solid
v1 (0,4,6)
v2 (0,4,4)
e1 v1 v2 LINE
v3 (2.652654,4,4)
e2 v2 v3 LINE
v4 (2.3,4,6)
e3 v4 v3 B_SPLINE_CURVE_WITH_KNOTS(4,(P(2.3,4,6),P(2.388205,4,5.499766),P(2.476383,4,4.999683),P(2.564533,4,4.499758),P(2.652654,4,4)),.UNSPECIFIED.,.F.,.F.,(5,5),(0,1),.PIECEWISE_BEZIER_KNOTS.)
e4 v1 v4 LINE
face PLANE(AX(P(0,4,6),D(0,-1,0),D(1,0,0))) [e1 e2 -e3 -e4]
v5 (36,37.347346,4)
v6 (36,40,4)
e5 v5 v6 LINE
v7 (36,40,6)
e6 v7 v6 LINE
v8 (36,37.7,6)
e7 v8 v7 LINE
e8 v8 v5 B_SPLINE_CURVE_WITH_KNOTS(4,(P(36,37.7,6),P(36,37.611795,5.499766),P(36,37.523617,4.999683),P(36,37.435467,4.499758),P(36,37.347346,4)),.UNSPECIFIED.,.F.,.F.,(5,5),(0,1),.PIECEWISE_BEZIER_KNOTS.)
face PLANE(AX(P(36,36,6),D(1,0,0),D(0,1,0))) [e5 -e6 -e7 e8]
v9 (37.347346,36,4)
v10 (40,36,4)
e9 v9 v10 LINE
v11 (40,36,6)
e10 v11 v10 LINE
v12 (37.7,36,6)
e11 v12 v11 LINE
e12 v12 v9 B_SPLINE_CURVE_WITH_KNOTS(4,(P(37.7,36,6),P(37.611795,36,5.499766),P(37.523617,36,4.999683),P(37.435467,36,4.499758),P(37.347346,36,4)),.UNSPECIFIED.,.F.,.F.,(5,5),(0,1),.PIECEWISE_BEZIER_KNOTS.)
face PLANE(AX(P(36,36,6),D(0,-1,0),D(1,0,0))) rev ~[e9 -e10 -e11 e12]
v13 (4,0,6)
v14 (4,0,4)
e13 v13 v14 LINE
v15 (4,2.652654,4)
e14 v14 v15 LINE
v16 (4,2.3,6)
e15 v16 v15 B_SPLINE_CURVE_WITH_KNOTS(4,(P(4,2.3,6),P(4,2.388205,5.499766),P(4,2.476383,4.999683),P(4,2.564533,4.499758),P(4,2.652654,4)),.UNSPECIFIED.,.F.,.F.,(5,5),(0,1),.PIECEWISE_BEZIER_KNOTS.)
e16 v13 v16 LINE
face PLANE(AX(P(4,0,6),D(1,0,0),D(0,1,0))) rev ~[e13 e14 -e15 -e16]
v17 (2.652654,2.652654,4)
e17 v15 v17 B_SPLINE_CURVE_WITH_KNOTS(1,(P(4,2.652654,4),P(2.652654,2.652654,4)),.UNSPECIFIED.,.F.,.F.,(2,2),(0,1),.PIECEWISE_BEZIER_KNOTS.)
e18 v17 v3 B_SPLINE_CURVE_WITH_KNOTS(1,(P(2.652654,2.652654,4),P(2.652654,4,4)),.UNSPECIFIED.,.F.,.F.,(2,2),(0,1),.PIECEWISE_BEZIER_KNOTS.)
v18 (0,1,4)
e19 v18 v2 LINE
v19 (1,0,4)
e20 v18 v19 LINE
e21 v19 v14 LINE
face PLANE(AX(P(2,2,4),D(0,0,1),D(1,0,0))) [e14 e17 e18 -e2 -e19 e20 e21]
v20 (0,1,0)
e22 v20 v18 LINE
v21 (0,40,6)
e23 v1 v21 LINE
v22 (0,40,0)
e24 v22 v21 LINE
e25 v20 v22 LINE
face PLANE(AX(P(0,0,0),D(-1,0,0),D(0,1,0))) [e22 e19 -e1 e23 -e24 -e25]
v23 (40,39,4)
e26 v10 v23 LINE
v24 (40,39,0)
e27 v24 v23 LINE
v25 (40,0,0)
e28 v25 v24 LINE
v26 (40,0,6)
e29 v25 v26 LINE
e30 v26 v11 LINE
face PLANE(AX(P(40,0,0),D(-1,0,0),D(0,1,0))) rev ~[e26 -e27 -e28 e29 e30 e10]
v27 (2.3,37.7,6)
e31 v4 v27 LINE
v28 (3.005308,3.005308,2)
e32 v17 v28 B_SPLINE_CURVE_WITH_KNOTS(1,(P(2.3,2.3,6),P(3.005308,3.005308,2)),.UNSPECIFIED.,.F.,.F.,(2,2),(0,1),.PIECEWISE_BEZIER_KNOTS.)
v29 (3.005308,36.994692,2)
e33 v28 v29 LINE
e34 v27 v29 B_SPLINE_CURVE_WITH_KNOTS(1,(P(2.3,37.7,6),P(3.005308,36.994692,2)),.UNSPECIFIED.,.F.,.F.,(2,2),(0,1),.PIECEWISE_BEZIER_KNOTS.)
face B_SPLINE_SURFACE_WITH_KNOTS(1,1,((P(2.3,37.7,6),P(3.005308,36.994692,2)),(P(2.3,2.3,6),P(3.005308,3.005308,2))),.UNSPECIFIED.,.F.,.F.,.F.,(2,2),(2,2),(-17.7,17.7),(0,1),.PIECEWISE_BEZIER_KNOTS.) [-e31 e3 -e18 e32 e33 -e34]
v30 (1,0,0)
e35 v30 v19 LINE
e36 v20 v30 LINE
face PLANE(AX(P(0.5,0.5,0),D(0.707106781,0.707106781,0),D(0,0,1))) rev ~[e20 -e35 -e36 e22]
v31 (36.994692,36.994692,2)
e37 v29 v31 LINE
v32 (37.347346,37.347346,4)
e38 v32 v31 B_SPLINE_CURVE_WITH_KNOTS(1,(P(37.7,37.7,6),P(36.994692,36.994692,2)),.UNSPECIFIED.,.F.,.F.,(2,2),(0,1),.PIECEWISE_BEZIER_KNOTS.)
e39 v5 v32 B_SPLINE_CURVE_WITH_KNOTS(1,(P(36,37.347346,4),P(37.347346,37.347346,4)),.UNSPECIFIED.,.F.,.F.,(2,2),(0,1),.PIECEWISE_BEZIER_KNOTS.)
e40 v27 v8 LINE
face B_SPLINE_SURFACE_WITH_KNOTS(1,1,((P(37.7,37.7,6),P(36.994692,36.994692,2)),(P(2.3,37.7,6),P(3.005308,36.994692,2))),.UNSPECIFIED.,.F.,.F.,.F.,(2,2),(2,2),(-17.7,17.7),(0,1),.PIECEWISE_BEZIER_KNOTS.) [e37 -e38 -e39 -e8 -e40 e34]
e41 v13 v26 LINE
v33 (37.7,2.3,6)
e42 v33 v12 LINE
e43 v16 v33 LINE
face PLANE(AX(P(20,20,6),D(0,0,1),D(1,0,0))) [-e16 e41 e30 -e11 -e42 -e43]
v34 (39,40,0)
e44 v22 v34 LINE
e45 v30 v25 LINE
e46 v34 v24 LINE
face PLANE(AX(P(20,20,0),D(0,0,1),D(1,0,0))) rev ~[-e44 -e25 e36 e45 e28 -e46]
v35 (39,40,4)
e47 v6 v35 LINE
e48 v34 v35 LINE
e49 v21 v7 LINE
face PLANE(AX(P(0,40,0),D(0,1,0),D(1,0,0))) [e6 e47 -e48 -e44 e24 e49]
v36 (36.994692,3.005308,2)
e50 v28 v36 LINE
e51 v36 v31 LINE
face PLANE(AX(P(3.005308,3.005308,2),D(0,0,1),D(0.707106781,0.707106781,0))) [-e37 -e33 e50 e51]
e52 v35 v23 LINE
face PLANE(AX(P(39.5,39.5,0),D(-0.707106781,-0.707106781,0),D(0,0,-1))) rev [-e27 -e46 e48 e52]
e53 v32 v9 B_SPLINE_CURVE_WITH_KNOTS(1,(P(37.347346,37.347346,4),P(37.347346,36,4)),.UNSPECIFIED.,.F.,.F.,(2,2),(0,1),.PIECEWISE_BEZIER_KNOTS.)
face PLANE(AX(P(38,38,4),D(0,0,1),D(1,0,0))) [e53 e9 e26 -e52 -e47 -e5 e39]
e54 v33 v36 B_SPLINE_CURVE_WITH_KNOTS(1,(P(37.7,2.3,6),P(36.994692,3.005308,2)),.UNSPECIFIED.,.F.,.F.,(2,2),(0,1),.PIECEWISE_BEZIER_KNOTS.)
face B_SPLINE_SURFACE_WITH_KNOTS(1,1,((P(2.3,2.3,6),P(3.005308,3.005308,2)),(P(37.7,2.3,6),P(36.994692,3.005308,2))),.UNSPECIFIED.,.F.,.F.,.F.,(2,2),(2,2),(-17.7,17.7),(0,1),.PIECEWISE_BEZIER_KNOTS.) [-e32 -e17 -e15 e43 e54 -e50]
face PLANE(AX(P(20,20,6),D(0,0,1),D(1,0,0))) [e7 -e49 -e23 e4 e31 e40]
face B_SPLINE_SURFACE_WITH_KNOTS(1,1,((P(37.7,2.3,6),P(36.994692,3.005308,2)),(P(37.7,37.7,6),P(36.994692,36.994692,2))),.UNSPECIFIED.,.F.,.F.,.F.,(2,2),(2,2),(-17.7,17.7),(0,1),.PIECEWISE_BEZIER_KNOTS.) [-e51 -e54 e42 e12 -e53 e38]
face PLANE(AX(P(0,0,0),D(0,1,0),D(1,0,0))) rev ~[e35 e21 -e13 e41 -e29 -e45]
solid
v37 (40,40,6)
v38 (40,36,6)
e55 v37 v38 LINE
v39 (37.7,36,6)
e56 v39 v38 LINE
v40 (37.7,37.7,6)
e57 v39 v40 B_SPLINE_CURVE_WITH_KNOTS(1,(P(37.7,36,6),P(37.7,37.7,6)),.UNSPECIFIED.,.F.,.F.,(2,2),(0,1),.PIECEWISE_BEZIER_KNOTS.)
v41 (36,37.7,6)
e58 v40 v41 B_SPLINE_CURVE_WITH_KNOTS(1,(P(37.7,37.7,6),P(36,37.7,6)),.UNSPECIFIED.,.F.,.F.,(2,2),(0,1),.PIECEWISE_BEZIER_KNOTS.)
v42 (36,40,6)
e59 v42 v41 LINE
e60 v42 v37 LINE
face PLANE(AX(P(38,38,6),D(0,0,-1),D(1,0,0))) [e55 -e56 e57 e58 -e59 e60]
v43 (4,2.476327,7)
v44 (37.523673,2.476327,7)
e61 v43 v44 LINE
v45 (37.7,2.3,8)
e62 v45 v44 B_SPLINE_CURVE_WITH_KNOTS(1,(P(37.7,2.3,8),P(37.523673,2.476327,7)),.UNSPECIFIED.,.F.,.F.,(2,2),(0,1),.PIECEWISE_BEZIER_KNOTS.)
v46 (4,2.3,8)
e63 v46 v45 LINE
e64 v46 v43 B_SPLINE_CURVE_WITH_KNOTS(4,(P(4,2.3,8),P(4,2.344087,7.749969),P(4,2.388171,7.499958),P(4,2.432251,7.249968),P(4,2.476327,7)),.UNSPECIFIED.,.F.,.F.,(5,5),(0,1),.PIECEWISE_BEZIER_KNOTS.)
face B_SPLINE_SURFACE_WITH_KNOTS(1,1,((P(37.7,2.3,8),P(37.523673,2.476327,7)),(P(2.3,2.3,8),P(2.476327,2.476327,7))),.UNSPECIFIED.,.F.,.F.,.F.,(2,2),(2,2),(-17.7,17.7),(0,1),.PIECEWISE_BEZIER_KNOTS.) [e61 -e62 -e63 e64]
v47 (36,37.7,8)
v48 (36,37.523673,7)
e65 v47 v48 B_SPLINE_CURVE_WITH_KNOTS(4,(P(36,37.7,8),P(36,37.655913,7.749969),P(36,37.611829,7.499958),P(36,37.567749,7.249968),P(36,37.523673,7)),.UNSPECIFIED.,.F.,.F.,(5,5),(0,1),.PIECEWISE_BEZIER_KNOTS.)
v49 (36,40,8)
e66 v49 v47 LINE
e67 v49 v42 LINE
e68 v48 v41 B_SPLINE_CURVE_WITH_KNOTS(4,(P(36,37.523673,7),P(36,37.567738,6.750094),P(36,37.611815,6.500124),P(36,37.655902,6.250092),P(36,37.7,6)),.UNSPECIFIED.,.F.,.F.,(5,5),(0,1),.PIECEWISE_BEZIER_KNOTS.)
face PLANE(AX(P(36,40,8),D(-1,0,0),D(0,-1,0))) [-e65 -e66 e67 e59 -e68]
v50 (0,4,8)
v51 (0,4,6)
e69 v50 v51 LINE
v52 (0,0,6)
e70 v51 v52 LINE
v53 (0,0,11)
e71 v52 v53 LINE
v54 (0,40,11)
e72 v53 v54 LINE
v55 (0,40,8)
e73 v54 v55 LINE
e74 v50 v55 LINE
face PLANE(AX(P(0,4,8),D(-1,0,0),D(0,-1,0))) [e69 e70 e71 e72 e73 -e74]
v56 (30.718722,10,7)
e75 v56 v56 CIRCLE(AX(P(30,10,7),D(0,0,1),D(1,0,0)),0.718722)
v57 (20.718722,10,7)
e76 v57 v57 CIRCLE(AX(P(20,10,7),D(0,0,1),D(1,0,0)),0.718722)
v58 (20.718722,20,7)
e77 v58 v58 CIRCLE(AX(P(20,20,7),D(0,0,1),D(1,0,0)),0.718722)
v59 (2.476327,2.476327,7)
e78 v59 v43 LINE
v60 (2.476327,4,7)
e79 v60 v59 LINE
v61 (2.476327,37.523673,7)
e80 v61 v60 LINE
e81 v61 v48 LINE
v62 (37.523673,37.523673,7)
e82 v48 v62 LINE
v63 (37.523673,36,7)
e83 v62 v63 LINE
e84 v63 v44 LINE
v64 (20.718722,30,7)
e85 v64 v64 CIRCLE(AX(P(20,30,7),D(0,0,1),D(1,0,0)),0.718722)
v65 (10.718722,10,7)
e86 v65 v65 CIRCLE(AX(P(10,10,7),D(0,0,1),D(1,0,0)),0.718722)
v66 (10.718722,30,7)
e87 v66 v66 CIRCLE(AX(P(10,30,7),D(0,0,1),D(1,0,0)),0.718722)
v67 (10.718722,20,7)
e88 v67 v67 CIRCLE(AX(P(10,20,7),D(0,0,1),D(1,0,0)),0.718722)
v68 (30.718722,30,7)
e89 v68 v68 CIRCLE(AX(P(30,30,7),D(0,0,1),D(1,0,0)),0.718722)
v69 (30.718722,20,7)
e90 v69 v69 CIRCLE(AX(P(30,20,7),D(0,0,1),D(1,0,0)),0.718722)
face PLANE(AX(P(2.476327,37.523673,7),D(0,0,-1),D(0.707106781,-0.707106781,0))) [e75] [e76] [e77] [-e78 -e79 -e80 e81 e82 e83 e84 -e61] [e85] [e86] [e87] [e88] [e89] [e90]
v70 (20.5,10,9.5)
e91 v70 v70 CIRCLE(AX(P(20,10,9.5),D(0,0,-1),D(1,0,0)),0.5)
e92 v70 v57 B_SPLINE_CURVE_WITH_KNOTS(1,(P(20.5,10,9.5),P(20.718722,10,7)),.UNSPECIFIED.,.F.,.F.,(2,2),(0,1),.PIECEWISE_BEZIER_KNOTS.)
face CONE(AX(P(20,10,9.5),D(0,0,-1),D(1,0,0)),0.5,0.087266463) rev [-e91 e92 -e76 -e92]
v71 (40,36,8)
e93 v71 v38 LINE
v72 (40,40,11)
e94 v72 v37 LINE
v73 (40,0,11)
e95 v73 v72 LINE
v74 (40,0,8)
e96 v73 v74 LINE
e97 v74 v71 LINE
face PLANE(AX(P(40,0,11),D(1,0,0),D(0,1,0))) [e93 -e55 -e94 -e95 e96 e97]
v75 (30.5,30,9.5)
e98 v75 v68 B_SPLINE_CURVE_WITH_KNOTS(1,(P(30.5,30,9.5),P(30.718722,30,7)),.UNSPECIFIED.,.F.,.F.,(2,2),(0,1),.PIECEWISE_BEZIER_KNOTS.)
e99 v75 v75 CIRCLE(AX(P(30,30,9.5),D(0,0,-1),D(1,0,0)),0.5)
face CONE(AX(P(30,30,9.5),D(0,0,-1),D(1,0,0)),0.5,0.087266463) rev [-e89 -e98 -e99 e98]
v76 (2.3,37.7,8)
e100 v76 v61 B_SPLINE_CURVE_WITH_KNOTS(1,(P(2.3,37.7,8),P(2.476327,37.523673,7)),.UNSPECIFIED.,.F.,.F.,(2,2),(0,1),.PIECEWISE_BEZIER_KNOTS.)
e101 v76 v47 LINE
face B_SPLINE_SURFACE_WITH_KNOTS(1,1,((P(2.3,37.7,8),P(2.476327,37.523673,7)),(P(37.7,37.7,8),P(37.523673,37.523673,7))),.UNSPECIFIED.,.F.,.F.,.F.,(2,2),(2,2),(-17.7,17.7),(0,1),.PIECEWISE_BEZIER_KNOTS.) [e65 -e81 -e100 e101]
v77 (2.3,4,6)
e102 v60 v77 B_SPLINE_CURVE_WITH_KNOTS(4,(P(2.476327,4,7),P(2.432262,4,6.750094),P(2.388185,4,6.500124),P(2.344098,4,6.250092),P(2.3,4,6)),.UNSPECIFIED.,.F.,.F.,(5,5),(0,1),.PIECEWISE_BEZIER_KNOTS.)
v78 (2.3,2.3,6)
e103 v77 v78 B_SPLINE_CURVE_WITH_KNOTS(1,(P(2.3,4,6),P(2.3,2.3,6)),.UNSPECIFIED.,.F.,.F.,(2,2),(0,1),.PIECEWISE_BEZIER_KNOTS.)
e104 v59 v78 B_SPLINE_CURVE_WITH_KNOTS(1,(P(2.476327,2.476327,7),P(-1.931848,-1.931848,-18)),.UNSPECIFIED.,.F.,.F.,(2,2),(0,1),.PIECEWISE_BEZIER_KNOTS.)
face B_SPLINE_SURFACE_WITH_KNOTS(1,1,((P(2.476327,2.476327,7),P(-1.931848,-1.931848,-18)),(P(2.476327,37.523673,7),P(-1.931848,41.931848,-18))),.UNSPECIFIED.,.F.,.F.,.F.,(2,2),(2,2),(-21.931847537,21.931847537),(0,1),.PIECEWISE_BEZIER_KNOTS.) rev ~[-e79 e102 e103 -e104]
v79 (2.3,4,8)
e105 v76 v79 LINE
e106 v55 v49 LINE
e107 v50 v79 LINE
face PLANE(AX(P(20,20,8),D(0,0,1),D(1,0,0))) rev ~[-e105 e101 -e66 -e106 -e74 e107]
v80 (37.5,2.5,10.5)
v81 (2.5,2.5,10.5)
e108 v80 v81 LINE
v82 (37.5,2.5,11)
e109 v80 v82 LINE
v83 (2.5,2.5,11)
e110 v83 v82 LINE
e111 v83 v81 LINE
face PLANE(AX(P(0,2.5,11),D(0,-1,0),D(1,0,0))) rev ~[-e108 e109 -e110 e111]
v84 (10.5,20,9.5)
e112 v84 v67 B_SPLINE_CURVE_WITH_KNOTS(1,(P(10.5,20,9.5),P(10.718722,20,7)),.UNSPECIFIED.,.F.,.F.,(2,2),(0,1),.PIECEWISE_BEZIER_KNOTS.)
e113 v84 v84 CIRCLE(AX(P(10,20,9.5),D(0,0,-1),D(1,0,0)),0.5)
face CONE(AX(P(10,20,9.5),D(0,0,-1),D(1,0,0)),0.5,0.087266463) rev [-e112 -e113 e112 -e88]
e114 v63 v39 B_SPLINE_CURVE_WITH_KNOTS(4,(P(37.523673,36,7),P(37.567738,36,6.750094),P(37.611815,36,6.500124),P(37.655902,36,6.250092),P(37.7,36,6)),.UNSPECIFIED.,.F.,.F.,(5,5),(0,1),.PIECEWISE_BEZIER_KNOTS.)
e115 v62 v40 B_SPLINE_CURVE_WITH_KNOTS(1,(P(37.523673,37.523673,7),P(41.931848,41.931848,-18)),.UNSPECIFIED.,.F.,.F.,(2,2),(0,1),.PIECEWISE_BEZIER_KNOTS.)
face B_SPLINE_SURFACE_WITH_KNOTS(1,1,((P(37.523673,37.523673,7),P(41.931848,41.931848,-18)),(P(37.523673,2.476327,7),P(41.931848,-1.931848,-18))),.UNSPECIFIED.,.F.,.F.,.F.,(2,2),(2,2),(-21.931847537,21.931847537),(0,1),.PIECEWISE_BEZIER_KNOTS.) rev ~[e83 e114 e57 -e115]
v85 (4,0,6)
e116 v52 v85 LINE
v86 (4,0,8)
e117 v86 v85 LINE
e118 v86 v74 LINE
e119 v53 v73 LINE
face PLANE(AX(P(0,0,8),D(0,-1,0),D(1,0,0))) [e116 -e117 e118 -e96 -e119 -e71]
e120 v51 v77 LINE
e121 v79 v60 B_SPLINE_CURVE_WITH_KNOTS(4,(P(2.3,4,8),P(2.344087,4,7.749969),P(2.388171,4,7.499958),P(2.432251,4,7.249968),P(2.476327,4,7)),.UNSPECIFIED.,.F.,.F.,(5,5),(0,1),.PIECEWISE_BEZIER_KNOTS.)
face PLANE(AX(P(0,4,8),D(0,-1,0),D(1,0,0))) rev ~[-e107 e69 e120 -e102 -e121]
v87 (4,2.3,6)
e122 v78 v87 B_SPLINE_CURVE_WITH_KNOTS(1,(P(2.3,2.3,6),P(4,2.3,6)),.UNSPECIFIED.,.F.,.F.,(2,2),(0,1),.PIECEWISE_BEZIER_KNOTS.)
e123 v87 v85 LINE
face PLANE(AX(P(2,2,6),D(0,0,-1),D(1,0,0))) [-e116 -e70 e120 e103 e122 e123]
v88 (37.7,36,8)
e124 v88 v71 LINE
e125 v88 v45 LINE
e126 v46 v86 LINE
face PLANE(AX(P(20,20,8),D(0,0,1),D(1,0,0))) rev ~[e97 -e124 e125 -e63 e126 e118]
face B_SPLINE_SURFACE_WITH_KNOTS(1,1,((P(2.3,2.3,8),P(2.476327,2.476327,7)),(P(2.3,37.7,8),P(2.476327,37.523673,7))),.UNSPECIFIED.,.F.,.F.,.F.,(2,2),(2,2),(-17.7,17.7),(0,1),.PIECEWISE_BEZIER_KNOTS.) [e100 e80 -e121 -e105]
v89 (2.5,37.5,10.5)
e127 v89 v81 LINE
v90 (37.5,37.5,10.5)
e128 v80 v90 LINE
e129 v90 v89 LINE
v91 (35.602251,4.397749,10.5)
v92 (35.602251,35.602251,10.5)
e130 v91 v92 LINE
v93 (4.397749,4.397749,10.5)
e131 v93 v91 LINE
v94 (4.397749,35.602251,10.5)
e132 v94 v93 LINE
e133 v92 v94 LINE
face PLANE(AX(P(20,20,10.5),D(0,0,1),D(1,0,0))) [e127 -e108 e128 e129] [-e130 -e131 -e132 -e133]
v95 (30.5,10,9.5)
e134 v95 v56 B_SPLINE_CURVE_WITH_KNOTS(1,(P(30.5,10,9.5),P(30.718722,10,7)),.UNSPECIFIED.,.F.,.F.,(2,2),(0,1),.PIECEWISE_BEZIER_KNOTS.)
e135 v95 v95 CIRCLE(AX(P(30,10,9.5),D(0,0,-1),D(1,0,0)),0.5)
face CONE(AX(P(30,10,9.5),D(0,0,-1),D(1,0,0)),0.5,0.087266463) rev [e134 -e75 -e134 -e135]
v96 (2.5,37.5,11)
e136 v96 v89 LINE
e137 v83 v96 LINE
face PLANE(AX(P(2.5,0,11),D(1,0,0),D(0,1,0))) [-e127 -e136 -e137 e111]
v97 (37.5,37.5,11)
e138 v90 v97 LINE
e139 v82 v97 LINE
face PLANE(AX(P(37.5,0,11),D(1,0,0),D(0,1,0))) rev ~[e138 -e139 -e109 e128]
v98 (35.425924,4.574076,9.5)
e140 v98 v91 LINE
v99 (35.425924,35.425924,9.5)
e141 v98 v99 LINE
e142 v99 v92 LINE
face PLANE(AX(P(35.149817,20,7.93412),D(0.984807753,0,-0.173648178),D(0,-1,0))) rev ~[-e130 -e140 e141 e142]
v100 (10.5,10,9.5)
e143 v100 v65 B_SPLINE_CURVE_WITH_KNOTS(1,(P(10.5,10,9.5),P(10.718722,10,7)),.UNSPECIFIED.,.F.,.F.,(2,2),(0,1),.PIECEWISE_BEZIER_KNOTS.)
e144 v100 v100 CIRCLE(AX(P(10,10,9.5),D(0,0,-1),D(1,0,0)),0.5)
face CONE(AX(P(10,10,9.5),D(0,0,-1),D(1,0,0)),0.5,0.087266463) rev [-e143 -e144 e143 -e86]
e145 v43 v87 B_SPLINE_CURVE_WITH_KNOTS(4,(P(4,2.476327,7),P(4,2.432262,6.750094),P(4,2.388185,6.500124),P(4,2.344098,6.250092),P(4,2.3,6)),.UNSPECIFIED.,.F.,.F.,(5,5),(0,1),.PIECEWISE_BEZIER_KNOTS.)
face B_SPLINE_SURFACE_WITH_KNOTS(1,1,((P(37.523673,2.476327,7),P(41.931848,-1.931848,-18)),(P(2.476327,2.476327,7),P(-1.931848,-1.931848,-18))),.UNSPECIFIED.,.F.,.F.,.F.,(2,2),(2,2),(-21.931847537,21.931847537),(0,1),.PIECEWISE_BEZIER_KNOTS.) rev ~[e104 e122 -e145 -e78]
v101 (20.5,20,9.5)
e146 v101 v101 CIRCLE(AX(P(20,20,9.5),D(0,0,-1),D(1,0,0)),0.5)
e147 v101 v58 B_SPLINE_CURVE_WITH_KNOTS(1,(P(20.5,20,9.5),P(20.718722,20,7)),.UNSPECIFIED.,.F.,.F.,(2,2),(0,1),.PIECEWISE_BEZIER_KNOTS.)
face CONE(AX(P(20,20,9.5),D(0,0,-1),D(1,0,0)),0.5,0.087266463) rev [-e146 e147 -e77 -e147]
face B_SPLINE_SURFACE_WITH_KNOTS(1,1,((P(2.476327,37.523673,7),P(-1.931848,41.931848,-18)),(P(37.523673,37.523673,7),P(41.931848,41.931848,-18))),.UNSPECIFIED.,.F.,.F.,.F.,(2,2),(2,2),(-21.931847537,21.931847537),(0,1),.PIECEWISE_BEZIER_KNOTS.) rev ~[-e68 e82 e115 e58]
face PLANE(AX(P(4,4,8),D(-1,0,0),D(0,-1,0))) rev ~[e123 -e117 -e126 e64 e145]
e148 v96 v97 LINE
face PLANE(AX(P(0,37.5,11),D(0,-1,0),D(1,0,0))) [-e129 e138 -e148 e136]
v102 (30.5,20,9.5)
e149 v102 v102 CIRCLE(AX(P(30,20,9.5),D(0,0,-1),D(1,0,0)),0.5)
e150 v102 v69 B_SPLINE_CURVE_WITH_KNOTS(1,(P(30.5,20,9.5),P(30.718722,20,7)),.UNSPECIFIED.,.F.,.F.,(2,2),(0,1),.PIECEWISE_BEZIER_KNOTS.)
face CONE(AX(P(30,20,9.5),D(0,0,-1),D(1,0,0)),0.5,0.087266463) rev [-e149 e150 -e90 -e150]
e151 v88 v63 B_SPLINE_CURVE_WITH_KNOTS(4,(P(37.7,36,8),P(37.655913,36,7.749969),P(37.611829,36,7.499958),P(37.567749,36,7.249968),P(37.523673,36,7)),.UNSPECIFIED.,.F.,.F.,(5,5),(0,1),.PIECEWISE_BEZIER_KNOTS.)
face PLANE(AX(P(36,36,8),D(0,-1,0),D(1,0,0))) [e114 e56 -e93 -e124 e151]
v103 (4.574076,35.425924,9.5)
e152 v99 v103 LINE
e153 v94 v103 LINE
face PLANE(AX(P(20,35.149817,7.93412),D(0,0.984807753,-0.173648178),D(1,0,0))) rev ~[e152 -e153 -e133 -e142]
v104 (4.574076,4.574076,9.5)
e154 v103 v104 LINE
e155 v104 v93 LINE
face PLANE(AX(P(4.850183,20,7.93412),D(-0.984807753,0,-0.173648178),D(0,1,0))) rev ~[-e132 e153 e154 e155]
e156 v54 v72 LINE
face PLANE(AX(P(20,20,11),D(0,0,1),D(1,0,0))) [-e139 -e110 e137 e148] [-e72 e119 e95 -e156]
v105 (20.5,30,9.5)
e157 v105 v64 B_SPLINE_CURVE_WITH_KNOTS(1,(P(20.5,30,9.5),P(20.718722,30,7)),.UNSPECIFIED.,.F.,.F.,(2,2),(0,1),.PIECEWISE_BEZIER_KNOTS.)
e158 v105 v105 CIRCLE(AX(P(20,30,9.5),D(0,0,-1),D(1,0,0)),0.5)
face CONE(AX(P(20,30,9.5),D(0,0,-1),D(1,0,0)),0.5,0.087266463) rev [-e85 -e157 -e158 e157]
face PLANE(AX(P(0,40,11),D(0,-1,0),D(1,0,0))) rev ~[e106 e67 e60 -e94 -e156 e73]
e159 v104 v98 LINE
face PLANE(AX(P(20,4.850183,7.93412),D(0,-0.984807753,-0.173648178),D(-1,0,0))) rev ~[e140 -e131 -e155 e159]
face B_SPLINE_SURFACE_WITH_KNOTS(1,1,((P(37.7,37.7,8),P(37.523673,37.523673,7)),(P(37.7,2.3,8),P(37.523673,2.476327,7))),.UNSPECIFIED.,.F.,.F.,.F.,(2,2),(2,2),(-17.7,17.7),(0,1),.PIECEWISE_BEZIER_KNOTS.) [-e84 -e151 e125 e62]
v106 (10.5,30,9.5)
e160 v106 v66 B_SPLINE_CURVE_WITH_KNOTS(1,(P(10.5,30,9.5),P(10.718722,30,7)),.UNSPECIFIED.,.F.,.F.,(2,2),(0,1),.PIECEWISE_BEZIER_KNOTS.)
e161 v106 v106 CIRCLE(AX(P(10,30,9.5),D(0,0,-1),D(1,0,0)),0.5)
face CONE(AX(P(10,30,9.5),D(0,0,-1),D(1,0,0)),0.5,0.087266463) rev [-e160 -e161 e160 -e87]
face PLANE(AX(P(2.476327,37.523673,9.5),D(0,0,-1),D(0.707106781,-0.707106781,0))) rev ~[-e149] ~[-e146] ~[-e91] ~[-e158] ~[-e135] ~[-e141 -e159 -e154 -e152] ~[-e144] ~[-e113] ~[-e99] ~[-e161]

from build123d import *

# Parameters (mm, degrees)
F0_W      = 40
F0_H      = 40
F1_DEPTH  = 6
F4_W      = 40
F4_H      = 40
F5_DEPTH  = 3
F2_W      = 35.4
F2_H      = 35.4
F6_DEPTH  = 4
F6_TAPER  = 10
F8_W      = 35.4
F8_H      = 35.4
F9_DEPTH  = 1
F9_TAPER  = 10
F10_T     = -2.5
F11_R     = 0.5
F12_DEPTH = 2.5
F12_TAPER = -5
F13_SIZE  = 1
F14_W     = 4
F14_H     = 4
F15_DEPTH = 2
F17_W     = 4
F17_H     = 4
F18_DEPTH = 2
F19_W     = 35.0473460386
F19_H     = 35.0473460386
F20_DEPTH = 25
F20_TAPER = -10


with BuildPart() as f1:
    # F0 (on Top) → F1 (new body)
    with BuildSketch(Plane.XY):
        with Locations((20, 20)):
            Rectangle(F0_W, F0_H)
    extrude(amount=F1_DEPTH)

    # F2 (on face) → F6 (cut)
    with BuildSketch(Plane.XY.offset(6)):
        with Locations((20, 20)):
            Rectangle(F2_W, F2_H)
    extrude(amount=-F6_DEPTH, taper=F6_TAPER, mode=Mode.SUBTRACT)

    # F13
    f13_edges = [f1.edges().sort_by_distance(p)[0] for p in [
        (0, 0, 3),
        (40, 40, 3),
    ]]
    chamfer(f13_edges, length=F13_SIZE)

    # F14 (on face) → F15 (cut)
    with BuildSketch(Plane.XY.offset(6)):
        with Locations((2, 2)):
            Rectangle(F14_W, F14_H)
        with Locations((38, 38)):
            Rectangle(F14_W, F14_H)
    extrude(amount=-F15_DEPTH, mode=Mode.SUBTRACT)


with BuildPart() as f5:
    # F4 (on offset) → F5 (new body)
    with BuildSketch(Plane.XY.offset(11)):
        with Locations((20, 20)):
            Rectangle(F4_W, F4_H)
    extrude(amount=-F5_DEPTH)

    # F8 (on face) → F9 (join)
    with BuildSketch(Plane(origin=(0, 0, 8), x_dir=(1, 0, 0), z_dir=(0, 0, -1))):
        with Locations((20, -20)):
            Rectangle(F8_W, F8_H)
    extrude(amount=F9_DEPTH, taper=F9_TAPER)

    # F10
    f10_openings = [f5.faces().sort_by_distance(p)[0] for p in [
        (20, 20, 11),
    ]]
    offset(amount=F10_T, openings=f10_openings, kind=Kind.INTERSECTION)

    # F11 (on face) → F12 (cut, through all)
    with BuildSketch(Plane.XY.offset(9.5)):
        with Locations((10, 30)):
            Circle(F11_R)
        with Locations((20, 30)):
            Circle(F11_R)
        with Locations((30, 30)):
            Circle(F11_R)
        with Locations((10, 20)):
            Circle(F11_R)
        with Locations((10, 10)):
            Circle(F11_R)
        with Locations((20, 20)):
            Circle(F11_R)
        with Locations((20, 10)):
            Circle(F11_R)
        with Locations((30, 20)):
            Circle(F11_R)
        with Locations((30, 10)):
            Circle(F11_R)
    extrude(amount=-F12_DEPTH, taper=F12_TAPER, mode=Mode.SUBTRACT)

    # F17 (on face) → F18 (join)
    with BuildSketch(Plane(origin=(0, 0, 8), x_dir=(1, 0, 0), z_dir=(0, 0, -1))):
        with Locations((2, -2)):
            Rectangle(F17_W, F17_H)
        with Locations((38, -38)):
            Rectangle(F17_W, F17_H)
    extrude(amount=F18_DEPTH)

    # F19 (on face) → F20 (cut)
    with BuildSketch(Plane(origin=(0, 0, 7), x_dir=(1, 0, 0), z_dir=(0, 0, -1))):
        with Locations((20, -20)):
            Rectangle(F19_W, F19_H)
    extrude(amount=F20_DEPTH, taper=F20_TAPER, mode=Mode.SUBTRACT)


solid = Compound([f1.part, f5.part])
